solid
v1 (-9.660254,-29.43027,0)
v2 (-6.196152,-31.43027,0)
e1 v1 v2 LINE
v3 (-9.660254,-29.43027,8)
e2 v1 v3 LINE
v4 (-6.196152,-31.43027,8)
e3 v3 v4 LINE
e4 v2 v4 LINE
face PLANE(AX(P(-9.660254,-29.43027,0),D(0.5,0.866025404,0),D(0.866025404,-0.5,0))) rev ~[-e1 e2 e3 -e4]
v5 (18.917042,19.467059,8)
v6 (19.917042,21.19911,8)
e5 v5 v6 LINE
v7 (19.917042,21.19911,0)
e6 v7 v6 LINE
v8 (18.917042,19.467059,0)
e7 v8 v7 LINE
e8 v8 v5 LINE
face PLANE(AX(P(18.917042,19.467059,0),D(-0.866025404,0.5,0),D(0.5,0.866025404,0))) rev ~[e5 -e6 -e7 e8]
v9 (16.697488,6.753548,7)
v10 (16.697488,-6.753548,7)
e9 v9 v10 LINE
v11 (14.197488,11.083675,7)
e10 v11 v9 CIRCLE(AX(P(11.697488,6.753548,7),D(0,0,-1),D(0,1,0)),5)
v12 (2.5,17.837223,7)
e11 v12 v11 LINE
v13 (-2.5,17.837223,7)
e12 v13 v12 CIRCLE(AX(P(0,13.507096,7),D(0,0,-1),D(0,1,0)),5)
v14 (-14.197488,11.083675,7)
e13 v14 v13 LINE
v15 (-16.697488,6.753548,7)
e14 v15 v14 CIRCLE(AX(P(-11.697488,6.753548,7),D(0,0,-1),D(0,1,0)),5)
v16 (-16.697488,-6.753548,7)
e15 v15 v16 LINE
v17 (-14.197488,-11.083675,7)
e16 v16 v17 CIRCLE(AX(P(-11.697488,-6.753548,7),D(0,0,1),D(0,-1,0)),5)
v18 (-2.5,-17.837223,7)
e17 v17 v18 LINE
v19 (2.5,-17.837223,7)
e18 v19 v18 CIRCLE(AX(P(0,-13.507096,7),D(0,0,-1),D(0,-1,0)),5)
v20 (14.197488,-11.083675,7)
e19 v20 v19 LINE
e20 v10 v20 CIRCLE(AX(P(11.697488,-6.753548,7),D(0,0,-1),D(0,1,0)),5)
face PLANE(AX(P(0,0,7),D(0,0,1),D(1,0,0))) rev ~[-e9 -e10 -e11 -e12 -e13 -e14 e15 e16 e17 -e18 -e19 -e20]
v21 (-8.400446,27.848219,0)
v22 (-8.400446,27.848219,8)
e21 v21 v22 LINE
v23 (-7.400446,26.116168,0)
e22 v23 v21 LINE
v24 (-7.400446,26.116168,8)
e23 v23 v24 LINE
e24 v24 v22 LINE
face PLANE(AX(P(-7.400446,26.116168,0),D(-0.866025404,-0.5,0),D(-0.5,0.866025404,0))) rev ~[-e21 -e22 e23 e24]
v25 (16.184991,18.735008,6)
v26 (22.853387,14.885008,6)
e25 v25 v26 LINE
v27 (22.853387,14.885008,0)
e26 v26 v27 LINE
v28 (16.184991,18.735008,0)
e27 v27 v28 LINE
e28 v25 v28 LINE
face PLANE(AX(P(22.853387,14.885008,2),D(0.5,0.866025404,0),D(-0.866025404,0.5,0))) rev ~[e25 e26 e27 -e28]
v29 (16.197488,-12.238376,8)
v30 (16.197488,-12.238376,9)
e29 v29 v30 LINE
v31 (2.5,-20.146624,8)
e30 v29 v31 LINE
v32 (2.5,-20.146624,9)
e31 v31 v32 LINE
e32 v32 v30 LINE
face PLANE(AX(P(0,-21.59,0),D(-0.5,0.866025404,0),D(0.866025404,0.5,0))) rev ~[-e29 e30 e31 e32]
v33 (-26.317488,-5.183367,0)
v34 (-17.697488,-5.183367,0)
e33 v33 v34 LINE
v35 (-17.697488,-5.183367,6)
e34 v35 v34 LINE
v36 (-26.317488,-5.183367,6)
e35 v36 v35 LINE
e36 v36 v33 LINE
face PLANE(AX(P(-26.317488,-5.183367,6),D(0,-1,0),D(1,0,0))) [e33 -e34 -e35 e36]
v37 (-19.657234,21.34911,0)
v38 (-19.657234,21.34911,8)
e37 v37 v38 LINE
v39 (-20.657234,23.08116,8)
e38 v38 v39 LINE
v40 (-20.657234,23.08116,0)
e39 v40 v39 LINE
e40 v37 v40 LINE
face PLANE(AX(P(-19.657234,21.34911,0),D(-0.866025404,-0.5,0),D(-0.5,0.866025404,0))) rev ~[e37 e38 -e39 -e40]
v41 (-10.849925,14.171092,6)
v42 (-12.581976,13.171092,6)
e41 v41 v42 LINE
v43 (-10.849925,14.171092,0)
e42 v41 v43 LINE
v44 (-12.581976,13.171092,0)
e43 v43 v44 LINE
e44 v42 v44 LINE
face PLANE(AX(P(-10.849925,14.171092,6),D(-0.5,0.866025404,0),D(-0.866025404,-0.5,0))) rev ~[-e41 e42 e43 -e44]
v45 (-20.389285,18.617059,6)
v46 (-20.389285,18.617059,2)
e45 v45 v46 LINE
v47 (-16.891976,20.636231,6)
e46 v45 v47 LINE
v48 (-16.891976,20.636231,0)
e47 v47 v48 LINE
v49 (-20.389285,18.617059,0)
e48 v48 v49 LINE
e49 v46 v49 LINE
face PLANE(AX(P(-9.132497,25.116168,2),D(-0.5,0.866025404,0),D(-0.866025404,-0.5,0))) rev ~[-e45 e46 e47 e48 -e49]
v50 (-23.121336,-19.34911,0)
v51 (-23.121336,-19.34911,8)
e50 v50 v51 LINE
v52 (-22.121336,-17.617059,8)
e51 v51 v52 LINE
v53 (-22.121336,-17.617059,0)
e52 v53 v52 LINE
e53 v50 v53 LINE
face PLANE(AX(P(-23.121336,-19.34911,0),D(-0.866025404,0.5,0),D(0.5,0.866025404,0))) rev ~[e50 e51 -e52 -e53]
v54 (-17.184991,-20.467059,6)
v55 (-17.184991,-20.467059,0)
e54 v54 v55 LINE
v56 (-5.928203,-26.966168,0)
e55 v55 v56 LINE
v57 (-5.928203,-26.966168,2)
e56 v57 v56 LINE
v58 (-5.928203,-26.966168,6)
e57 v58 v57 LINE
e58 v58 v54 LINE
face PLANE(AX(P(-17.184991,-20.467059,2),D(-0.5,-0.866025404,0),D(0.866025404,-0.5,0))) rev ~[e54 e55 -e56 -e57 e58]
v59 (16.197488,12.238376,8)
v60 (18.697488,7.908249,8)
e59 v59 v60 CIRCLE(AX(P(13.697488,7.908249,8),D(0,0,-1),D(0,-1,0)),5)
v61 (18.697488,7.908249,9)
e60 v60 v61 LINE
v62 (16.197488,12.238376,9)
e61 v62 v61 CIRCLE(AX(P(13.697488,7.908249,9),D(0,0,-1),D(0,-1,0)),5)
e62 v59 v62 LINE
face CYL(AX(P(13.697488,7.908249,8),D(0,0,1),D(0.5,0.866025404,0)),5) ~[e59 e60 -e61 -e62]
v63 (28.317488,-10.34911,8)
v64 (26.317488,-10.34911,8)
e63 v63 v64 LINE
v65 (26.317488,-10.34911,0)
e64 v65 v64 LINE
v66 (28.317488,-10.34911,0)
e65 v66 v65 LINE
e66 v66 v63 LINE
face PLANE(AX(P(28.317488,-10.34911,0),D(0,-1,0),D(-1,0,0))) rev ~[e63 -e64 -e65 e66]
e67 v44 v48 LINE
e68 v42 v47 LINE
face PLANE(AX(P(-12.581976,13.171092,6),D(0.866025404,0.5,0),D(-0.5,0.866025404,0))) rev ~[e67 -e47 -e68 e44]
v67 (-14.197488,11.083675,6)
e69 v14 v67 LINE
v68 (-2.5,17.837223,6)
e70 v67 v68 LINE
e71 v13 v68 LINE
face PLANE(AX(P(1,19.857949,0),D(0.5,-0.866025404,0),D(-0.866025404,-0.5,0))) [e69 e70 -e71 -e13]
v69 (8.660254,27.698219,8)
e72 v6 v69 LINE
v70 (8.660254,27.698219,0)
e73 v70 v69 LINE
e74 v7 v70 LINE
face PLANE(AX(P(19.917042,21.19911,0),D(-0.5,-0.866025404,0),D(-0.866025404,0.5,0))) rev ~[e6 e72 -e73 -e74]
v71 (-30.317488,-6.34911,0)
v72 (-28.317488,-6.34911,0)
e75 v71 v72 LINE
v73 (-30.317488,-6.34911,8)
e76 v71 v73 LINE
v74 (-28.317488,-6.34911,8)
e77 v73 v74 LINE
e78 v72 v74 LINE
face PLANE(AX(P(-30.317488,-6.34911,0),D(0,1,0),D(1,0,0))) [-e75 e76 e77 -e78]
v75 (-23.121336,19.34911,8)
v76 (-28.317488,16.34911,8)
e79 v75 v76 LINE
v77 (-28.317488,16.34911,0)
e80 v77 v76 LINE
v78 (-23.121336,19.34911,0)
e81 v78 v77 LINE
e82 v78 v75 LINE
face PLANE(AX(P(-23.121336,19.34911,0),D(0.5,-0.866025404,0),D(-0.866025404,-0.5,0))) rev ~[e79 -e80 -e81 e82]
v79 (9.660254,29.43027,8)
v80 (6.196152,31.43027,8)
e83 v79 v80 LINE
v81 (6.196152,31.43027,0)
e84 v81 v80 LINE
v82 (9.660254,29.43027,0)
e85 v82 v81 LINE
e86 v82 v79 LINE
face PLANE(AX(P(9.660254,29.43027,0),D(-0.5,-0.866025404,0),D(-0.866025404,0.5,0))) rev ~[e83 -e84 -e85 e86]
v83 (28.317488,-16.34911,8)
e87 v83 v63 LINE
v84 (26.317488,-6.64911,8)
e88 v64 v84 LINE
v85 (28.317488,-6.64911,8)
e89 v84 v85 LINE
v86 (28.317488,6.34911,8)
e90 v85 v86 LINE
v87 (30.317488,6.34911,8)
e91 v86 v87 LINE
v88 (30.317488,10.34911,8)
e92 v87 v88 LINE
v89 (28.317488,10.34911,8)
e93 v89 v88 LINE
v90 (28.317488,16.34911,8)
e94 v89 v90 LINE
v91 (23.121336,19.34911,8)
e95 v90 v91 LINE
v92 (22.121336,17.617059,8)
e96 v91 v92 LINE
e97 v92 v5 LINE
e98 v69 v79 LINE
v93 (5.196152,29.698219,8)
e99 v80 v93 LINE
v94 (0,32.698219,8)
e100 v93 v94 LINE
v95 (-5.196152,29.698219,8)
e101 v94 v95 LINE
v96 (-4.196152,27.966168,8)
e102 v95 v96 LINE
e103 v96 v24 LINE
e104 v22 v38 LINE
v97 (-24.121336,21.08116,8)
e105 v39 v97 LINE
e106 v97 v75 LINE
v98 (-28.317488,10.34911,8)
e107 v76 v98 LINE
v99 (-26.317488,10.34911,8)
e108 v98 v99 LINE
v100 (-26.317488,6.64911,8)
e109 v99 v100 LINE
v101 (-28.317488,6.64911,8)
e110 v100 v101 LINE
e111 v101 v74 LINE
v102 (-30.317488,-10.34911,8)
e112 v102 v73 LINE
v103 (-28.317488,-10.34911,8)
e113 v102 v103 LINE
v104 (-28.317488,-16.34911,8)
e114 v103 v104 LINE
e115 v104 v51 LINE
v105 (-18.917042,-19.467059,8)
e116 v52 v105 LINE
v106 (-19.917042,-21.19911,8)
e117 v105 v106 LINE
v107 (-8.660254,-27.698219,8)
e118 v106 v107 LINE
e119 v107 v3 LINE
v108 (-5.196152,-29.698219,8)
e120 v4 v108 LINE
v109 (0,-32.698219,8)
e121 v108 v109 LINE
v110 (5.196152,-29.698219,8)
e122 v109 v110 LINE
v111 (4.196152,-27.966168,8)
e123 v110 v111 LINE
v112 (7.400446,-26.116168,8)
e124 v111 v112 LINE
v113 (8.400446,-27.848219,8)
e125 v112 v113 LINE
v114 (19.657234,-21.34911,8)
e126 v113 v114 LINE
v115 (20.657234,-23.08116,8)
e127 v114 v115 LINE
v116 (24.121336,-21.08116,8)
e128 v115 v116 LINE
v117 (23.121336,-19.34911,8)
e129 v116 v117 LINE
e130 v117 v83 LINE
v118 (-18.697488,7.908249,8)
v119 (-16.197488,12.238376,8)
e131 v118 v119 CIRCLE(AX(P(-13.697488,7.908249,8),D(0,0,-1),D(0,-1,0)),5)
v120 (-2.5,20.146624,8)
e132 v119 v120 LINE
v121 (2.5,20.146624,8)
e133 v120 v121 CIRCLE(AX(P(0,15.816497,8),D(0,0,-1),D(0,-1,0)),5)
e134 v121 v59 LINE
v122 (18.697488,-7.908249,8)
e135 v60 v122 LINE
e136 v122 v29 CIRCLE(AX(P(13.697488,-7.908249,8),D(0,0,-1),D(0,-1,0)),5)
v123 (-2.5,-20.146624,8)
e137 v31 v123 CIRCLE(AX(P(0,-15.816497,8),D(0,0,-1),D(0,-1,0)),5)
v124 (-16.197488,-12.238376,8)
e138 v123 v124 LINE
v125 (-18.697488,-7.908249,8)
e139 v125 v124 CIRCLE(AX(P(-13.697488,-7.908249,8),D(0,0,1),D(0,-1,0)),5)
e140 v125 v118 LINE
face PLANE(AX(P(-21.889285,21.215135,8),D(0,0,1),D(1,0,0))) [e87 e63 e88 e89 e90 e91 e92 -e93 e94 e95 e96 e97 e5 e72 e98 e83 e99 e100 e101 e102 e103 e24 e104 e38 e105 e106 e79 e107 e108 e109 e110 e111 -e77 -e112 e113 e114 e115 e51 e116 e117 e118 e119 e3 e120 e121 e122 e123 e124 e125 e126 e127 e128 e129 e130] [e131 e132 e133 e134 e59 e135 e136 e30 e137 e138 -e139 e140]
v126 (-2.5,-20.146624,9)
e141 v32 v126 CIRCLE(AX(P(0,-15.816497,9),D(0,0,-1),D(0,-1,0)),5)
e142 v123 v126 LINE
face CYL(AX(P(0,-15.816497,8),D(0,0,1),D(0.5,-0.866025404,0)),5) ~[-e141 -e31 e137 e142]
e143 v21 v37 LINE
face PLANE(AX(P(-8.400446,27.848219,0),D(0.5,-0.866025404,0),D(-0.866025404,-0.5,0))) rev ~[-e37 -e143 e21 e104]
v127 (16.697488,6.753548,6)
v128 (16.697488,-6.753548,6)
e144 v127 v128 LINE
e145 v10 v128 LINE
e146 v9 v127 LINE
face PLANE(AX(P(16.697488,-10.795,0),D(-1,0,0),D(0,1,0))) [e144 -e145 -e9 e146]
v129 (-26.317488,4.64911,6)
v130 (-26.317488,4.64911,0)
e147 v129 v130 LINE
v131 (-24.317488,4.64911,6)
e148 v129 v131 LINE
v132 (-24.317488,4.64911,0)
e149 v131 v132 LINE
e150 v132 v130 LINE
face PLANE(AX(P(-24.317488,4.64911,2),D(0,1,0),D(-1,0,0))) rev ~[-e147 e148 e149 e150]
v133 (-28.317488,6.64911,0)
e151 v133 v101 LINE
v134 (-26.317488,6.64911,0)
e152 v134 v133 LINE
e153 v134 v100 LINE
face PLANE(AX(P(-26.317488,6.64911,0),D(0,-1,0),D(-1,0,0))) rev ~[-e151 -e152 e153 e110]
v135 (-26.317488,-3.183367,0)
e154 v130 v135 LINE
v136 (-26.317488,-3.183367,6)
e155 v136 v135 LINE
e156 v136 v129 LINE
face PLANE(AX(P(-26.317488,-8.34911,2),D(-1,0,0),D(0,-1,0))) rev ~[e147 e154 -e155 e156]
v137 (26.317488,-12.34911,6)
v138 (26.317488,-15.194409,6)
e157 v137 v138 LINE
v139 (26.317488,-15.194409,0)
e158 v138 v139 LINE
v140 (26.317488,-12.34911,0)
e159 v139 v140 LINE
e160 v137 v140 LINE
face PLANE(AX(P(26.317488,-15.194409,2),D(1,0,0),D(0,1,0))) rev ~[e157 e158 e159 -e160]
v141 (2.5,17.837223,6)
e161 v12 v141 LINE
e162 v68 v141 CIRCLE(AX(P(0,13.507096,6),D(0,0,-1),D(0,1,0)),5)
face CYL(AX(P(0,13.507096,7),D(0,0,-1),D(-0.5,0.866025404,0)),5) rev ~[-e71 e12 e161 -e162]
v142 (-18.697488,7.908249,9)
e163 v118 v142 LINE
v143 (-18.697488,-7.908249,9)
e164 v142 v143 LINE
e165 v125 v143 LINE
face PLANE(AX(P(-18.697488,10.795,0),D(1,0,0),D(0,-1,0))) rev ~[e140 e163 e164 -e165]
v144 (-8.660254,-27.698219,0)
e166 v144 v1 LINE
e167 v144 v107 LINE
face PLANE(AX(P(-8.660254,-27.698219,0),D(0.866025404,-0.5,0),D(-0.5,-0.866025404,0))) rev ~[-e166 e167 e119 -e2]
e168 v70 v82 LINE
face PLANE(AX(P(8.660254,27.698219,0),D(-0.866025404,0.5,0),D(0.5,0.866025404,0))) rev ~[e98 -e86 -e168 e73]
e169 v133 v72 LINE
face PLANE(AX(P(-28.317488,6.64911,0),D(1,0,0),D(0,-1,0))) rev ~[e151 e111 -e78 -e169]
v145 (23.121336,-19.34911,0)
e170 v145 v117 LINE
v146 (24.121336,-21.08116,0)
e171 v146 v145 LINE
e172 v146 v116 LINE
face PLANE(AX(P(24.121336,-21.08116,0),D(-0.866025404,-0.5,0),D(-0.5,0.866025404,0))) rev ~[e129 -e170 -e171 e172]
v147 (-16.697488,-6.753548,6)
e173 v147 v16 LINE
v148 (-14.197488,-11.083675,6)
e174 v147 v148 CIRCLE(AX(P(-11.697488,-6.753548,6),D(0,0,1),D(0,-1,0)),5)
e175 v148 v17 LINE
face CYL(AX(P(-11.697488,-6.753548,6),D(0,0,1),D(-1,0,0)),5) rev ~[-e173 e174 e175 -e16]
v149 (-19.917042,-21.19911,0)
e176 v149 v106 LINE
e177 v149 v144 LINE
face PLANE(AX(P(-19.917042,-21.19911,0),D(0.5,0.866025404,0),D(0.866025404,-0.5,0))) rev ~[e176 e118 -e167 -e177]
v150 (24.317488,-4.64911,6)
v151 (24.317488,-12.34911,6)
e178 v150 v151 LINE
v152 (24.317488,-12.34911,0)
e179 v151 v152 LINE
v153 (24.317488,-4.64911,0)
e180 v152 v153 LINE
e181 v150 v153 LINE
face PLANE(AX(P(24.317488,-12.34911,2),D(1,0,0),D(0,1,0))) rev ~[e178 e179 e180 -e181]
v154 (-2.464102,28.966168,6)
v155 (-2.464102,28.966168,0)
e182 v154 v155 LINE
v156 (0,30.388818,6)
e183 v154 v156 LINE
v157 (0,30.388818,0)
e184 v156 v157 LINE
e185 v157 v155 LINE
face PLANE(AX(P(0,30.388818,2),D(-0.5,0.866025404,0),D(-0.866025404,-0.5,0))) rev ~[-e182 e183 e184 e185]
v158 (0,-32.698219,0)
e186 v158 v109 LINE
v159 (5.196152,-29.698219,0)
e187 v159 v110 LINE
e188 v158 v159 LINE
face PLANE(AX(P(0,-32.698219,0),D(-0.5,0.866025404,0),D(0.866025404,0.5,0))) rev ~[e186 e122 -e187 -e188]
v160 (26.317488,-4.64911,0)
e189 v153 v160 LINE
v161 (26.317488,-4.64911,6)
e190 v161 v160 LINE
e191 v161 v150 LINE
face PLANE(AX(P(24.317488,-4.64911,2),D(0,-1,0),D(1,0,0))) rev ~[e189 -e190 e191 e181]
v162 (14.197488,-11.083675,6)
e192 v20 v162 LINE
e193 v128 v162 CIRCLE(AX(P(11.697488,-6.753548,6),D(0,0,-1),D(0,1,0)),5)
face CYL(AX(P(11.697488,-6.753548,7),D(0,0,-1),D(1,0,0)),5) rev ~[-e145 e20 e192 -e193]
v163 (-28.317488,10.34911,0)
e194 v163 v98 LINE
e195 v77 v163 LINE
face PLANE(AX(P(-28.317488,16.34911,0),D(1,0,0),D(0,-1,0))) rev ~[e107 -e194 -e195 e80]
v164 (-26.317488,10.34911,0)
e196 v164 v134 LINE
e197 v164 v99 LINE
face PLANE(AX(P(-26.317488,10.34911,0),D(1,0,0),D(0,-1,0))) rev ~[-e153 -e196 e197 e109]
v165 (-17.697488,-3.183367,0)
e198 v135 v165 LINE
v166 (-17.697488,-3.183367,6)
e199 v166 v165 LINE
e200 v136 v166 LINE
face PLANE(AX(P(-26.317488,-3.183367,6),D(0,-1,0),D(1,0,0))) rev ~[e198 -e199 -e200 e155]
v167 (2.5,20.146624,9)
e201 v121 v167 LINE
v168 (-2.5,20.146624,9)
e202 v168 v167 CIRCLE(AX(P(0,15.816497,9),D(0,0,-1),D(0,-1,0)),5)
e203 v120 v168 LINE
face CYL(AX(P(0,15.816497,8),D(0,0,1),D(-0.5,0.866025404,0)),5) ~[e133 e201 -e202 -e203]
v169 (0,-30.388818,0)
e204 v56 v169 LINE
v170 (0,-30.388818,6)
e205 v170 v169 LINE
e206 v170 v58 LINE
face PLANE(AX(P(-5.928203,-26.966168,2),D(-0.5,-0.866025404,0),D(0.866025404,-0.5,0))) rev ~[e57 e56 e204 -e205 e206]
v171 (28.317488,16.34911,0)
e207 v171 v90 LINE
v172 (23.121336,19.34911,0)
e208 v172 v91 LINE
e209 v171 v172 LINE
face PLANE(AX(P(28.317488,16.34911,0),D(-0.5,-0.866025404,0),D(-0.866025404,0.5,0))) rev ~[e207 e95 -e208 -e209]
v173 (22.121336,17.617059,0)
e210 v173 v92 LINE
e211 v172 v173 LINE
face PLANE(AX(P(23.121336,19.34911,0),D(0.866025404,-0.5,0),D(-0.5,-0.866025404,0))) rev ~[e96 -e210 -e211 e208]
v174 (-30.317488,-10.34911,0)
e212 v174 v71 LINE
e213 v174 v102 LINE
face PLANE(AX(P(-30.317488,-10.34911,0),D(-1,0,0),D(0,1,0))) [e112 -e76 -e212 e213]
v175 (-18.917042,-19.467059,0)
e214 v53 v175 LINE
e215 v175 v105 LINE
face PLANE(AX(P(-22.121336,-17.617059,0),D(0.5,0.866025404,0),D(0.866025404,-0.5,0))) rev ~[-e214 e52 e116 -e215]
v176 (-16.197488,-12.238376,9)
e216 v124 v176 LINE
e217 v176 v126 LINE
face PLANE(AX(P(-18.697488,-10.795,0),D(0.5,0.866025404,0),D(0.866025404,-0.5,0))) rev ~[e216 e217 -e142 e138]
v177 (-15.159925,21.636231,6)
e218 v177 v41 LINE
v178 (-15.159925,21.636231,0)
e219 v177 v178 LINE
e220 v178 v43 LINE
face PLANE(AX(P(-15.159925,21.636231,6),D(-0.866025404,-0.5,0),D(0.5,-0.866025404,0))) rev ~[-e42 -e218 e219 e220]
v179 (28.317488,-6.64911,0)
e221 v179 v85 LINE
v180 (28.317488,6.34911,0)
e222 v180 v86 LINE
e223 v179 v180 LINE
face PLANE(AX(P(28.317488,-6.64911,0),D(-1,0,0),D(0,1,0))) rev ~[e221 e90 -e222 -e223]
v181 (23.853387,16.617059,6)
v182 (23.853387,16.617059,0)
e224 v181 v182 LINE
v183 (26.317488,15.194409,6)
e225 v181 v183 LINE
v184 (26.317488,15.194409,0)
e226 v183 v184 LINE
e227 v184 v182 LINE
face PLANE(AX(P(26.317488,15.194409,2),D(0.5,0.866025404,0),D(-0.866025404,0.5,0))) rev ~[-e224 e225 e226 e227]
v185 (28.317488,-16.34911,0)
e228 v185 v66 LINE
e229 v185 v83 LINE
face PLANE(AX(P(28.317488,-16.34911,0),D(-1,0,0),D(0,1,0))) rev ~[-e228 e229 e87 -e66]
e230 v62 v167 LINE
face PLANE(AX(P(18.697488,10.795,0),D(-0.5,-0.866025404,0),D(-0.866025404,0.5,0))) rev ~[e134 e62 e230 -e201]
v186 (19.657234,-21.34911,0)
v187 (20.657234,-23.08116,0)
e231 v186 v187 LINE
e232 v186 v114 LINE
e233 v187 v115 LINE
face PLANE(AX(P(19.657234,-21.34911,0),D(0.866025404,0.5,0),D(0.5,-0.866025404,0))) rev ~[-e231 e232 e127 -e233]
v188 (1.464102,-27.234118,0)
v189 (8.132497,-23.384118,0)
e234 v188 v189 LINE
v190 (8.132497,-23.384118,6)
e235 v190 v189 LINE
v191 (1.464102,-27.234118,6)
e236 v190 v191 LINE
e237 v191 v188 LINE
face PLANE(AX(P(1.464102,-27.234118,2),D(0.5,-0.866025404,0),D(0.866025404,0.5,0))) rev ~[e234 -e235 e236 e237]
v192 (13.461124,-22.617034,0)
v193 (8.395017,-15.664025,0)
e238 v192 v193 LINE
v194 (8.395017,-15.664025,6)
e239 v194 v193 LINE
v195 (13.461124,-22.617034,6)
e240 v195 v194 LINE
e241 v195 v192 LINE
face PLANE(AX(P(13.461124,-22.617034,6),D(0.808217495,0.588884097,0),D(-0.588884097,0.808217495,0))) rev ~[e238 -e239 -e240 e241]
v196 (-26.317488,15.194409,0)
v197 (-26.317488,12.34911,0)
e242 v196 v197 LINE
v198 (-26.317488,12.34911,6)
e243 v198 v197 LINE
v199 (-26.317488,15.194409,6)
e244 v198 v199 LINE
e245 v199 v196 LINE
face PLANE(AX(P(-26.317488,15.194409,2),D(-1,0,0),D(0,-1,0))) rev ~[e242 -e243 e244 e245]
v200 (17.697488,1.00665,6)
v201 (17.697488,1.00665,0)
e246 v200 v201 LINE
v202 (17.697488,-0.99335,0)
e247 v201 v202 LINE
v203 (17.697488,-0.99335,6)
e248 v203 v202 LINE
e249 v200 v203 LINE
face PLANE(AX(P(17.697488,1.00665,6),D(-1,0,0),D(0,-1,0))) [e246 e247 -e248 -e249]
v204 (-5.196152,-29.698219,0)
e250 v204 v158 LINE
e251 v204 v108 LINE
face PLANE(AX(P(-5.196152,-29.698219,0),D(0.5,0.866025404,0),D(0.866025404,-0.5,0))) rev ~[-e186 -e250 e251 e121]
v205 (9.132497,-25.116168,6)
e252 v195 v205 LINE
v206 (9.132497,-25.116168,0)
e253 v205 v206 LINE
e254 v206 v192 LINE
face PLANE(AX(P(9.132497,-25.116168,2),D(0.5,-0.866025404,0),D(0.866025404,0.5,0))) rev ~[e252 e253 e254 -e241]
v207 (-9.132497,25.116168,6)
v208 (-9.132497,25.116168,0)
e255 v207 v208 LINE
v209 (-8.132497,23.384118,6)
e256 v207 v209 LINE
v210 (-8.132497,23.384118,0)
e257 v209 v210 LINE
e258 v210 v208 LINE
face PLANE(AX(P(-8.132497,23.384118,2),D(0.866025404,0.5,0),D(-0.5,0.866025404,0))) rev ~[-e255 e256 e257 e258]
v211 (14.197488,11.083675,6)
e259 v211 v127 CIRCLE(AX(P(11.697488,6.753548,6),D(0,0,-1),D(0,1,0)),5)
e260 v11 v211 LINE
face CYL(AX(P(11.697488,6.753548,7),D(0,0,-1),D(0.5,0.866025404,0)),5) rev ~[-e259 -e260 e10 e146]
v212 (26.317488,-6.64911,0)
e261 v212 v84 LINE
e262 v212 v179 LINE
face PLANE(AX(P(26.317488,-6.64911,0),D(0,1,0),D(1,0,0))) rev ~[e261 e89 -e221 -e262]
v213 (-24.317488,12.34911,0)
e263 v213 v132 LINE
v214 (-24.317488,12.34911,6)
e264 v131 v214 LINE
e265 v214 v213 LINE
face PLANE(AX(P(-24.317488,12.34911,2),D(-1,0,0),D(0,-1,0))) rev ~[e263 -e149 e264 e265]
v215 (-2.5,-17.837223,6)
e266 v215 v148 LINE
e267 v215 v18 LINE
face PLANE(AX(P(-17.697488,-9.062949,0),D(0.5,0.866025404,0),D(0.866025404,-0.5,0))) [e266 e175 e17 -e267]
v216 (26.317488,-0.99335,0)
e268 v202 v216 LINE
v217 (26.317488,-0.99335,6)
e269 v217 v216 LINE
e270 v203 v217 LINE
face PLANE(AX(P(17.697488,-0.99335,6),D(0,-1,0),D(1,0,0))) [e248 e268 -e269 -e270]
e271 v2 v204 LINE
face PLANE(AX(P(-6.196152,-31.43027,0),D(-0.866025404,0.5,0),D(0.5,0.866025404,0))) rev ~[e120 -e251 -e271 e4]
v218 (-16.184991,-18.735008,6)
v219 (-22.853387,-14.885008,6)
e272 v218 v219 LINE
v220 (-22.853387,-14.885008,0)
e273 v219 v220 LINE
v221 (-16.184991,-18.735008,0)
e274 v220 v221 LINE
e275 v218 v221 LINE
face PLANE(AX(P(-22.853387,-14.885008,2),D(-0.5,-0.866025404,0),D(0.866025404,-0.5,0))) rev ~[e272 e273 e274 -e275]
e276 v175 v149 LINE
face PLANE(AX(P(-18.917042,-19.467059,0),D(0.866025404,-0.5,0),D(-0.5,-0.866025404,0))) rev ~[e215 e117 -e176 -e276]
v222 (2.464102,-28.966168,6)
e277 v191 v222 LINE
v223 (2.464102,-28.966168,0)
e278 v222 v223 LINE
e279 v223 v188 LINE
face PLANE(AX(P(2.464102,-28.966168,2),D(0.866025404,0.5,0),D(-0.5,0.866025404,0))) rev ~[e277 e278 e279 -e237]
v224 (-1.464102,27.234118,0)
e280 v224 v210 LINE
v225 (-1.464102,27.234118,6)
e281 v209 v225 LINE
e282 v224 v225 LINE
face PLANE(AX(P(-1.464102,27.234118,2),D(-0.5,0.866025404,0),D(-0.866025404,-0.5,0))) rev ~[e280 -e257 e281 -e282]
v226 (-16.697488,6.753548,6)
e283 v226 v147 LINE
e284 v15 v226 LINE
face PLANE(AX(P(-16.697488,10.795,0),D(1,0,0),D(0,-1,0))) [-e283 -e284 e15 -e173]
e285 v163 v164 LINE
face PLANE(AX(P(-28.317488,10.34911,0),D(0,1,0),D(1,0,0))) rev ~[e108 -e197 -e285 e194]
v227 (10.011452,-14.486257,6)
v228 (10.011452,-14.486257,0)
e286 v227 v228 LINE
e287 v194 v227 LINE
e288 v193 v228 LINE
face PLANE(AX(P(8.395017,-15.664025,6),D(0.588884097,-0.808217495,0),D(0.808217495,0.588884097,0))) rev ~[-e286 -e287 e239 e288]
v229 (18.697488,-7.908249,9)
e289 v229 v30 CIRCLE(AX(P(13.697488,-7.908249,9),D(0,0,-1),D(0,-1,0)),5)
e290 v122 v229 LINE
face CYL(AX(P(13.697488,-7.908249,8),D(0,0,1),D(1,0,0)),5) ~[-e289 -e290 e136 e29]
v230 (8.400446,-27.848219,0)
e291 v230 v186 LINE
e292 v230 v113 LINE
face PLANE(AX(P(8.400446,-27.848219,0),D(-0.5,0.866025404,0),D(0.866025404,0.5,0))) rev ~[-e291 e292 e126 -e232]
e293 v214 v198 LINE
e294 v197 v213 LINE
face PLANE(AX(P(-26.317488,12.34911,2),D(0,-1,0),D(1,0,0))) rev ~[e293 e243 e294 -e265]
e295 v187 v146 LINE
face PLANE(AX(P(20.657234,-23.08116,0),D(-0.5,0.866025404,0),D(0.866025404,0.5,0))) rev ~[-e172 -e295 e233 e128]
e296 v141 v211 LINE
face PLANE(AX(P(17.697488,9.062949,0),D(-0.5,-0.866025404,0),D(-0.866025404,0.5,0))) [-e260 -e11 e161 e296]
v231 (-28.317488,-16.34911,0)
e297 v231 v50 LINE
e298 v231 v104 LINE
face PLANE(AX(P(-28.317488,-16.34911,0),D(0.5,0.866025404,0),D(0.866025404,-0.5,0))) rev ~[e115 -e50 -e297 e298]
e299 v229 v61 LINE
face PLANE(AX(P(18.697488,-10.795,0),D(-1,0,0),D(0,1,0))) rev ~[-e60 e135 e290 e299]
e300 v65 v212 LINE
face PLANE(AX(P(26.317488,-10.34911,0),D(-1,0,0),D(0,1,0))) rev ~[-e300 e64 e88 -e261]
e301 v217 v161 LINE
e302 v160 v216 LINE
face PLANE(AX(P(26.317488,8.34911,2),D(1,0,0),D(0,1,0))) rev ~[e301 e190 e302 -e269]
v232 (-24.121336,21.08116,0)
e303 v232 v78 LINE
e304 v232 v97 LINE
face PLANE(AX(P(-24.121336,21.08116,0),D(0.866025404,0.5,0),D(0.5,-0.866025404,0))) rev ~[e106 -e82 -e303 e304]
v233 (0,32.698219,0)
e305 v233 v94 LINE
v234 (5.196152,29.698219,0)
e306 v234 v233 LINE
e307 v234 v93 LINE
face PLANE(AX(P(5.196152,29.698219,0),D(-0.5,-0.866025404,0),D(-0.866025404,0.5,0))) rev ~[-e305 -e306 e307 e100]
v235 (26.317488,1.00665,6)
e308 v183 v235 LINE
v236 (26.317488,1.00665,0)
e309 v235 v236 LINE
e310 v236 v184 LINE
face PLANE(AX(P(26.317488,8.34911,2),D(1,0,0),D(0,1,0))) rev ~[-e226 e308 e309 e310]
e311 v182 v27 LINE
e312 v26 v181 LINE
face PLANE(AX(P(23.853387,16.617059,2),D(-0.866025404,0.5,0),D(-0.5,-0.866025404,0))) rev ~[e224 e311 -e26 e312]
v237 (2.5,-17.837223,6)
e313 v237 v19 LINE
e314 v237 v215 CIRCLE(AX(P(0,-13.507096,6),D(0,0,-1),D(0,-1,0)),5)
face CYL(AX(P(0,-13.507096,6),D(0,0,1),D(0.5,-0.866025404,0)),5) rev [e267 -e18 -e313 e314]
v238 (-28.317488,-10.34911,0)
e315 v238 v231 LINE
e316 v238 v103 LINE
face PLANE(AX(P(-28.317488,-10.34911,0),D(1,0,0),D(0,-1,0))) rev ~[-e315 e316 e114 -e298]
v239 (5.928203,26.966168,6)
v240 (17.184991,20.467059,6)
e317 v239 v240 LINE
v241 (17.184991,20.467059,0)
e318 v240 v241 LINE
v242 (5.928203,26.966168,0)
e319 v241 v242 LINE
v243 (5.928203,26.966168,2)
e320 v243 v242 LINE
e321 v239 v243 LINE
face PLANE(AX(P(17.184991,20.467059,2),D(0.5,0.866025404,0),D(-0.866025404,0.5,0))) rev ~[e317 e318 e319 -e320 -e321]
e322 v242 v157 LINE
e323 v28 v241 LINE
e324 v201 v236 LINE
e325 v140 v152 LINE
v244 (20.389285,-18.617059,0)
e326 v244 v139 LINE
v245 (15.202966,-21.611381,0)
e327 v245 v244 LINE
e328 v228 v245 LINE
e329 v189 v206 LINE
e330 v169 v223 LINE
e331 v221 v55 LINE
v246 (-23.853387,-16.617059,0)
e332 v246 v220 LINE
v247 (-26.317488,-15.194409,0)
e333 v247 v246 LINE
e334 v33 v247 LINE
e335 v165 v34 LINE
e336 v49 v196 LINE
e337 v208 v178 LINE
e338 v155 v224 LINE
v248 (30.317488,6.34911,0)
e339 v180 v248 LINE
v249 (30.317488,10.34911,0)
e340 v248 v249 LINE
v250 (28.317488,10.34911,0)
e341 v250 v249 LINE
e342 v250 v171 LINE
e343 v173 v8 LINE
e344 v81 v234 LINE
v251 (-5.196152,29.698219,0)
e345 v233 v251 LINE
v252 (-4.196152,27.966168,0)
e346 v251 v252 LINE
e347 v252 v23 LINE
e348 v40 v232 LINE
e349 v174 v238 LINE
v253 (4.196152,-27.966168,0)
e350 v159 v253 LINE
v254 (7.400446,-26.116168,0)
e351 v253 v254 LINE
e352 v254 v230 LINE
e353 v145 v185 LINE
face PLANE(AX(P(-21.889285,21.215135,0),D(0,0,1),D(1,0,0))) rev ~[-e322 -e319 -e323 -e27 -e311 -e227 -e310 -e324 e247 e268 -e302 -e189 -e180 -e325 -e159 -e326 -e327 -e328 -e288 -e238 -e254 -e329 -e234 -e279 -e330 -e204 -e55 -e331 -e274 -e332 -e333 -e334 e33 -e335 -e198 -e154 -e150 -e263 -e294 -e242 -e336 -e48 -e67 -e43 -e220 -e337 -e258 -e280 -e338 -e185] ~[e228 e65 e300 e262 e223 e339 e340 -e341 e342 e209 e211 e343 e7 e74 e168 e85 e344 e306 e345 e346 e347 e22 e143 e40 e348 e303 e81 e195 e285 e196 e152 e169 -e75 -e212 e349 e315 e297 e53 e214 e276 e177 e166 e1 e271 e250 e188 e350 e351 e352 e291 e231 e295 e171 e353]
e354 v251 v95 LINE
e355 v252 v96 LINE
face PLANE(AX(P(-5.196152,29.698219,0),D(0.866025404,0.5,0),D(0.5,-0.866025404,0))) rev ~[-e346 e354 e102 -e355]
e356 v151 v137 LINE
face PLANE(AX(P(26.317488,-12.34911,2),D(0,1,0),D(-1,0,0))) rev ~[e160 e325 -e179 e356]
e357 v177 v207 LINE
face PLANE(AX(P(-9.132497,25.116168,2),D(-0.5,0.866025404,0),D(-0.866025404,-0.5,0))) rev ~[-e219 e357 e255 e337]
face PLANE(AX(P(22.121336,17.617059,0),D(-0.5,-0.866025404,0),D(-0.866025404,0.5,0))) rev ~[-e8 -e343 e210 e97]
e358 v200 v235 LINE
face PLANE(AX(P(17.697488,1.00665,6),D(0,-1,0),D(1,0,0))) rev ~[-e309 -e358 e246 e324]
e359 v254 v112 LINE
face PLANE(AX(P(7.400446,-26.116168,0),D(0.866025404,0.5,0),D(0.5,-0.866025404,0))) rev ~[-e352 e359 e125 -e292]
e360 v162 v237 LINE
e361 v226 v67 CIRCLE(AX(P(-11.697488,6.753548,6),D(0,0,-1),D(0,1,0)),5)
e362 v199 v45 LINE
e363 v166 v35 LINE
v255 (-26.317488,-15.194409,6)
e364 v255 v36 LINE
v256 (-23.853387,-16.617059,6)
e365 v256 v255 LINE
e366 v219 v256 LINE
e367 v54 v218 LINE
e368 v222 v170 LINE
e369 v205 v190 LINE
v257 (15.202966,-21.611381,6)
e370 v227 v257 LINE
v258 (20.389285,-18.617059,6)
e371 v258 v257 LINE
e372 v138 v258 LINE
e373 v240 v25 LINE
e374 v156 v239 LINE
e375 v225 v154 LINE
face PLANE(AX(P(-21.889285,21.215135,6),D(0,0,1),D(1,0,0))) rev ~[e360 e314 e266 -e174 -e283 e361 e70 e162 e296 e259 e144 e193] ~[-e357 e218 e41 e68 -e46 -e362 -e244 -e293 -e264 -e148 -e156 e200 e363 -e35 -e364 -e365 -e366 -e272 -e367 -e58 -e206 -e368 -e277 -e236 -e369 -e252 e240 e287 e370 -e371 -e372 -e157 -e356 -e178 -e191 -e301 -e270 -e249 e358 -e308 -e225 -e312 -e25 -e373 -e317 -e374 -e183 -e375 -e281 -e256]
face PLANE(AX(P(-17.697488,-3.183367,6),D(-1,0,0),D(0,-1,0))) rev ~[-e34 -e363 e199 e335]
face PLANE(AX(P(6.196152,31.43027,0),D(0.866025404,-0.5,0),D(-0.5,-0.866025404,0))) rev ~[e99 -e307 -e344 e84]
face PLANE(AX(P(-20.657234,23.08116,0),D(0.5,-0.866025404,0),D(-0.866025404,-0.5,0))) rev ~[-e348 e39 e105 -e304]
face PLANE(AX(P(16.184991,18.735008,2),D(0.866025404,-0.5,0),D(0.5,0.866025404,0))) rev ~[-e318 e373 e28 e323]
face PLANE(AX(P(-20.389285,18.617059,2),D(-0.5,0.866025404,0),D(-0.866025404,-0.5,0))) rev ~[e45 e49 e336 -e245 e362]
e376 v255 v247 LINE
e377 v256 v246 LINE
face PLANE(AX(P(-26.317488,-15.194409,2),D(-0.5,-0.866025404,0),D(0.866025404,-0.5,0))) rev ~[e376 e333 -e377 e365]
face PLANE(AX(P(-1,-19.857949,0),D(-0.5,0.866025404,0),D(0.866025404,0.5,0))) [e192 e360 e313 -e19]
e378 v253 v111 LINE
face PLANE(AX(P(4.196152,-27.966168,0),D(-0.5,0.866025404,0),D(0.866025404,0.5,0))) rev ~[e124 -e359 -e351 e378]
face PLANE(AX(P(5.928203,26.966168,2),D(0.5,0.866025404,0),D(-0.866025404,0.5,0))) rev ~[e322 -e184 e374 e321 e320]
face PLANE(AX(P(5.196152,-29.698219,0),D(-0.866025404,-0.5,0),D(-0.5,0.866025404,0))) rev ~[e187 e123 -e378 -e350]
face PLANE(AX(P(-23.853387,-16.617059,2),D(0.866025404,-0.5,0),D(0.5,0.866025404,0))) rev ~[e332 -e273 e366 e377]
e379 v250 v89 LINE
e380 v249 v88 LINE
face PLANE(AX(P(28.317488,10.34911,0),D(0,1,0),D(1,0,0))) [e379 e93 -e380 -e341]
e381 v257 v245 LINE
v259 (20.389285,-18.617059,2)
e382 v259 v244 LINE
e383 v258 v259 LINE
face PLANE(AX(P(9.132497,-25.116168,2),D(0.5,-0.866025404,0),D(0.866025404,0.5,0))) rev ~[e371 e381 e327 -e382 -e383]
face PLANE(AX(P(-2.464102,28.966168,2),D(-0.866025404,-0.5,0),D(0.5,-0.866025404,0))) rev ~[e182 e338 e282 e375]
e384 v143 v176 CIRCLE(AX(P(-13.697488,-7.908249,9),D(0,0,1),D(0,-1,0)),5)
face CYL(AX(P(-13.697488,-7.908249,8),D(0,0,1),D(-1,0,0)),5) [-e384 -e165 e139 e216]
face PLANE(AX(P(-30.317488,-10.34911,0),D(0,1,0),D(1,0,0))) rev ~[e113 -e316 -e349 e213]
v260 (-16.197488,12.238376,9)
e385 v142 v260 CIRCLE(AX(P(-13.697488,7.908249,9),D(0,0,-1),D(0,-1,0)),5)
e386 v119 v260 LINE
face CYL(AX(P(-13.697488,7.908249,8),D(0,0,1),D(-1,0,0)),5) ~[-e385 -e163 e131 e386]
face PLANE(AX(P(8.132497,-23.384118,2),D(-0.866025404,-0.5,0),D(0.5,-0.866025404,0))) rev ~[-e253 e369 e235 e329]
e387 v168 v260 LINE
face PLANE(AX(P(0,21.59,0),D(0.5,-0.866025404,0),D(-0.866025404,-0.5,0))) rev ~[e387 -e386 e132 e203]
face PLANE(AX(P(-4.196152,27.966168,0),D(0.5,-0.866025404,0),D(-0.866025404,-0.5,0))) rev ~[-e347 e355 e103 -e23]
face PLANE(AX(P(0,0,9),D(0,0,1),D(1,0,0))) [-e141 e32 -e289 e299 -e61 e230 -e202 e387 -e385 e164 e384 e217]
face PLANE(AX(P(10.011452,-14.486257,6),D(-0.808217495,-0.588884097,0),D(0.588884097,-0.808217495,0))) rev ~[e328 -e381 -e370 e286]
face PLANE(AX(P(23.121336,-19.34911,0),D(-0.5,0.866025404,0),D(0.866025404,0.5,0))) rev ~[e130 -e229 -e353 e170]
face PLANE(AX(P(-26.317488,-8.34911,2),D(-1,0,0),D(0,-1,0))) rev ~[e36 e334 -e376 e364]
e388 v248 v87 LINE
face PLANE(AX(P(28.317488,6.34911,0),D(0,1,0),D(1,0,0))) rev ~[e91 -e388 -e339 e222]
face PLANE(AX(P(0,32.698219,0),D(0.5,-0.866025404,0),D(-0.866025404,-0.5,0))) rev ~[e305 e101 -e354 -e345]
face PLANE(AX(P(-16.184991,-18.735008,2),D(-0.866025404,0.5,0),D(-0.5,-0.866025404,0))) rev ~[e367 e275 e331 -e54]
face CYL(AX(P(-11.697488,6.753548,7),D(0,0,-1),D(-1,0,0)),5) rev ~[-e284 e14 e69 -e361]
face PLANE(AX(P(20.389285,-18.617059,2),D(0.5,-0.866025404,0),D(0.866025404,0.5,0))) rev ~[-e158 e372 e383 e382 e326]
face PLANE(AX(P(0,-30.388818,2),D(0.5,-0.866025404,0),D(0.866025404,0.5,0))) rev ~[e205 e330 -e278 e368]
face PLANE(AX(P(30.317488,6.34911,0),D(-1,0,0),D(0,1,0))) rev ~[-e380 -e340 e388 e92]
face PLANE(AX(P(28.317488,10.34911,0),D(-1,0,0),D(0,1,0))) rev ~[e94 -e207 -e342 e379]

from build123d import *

# Parameters (mm, degrees)
F0_W     = 2
F0_H     = 4
F1_DEPTH = 8
F2_DEPTH = 9
F3_T     = -2
F4_R     = 5
F5_R     = 5
F6_W     = 8.62
F6_H     = 2
F7_DEPTH = 6


with BuildPart() as f1:
    # F0 (on Top) → F1 (new body)
    with BuildSketch(Plane.XY):
        Polygon((-23.121336045, 19.3491095896), (-19.6572344299, 21.3491095896), (-20.6572344299, 23.0811603972), (-24.121336045, 21.0811603972), align=None)
        Polygon((-7.4004464167, 26.1161683716), (-26.3174884677, 15.1944090512), (-26.3174884677, 10.3491095896), (-26.3174884677, 6.6491095896), (-26.3174884677, -15.1944090512), (-22.121336045, -17.617058782), (-18.917042051, -19.467058782), (0, -30.3888181024), (4.1961524227, -27.9661683716), (7.4004464167, -26.1161683716), (26.3174884677, -15.1944090512), (26.3174884677, -10.3491095896), (26.3174884677, -6.6491095896), (26.3174884677, 15.1944090512), (22.121336045, 17.617058782), (18.917042051, 19.467058782), (0, 30.3888181024), (-4.1961524227, 27.9661683716), align=None)
        Polygon((0, -21.59), (-18.6974884677, -10.795), (-18.6974884677, 10.795), (0, 21.59), (18.6974884677, 10.795), (18.6974884677, -10.795), align=None, mode=Mode.SUBTRACT)
        Polygon((-5.1961524227, -29.6982191792), (-8.6602540378, -27.6982191792), (-9.6602540378, -29.4302699868), (-6.1961524227, -31.4302699868), align=None)
        with Locations((29.3174884677, 8.3491095896)):
            Rectangle(F0_W, F0_H)
        with Locations((-29.3174884677, -8.3491095896)):
            Rectangle(F0_W, F0_H)
        Polygon((-26.3174884677, -15.1944090512), (-26.3174884677, 6.6491095896), (-28.3174884677, 6.6491095896), (-28.3174884677, -6.3491095896), (-28.3174884677, -10.3491095896), (-28.3174884677, -16.3491095896), (-23.121336045, -19.3491095896), (-22.121336045, -17.617058782), align=None)
        Polygon((-26.3174884677, 10.3491095896), (-26.3174884677, 15.1944090512), (-7.4004464167, 26.1161683716), (-8.4004464167, 27.8482191792), (-19.6572344299, 21.3491095896), (-23.121336045, 19.3491095896), (-28.3174884677, 16.3491095896), (-28.3174884677, 10.3491095896), align=None)
        Polygon((0, -30.3888181024), (-18.917042051, -19.467058782), (-19.917042051, -21.1991095896), (-8.6602540378, -27.6982191792), (-5.1961524227, -29.6982191792), (0, -32.6982191792), (5.1961524227, -29.6982191792), (4.1961524227, -27.9661683716), align=None)
        Polygon((28.3174884677, -10.3491095896), (26.3174884677, -10.3491095896), (26.3174884677, -15.1944090512), (7.4004464167, -26.1161683716), (8.4004464167, -27.8482191792), (19.6572344299, -21.3491095896), (23.121336045, -19.3491095896), (28.3174884677, -16.3491095896), align=None)
        Polygon((23.121336045, -19.3491095896), (19.6572344299, -21.3491095896), (20.6572344299, -23.0811603972), (24.121336045, -21.0811603972), align=None)
        Polygon((-5.1961524227, 29.6982191792), (-4.1961524227, 27.9661683716), (0, 30.3888181024), (18.917042051, 19.467058782), (19.917042051, 21.1991095896), (8.6602540378, 27.6982191792), (5.1961524227, 29.6982191792), (0, 32.6982191792), align=None)
        Polygon((6.1961524227, 31.4302699868), (5.1961524227, 29.6982191792), (8.6602540378, 27.6982191792), (9.6602540378, 29.4302699868), align=None)
        Polygon((23.121336045, 19.3491095896), (22.121336045, 17.617058782), (26.3174884677, 15.1944090512), (26.3174884677, -6.6491095896), (28.3174884677, -6.6491095896), (28.3174884677, 6.3491095896), (28.3174884677, 10.3491095896), (28.3174884677, 16.3491095896), align=None)
    extrude(amount=F1_DEPTH)

    # F0 (on Top) → F2 (join)
    with BuildSketch(Plane.XY):
        Polygon((-18.6974884677, 10.795), (-18.6974884677, -10.795), (0, -21.59), (18.6974884677, -10.795), (18.6974884677, 10.795), (0, 21.59), align=None)
    extrude(amount=F2_DEPTH)

    # F3: a shell. OpenCascade refuses it in one call, so the cavity is built on its own and cut out:
    # the body offset inwards by the wall thickness, plus a prism from it out through each open face.
    f3_core = offset(f1.part, amount=F3_T, kind=Kind.INTERSECTION, mode=Mode.PRIVATE)
    f3_exits = [f3_core.faces().sort_by_distance(p)[0] for p in [
        (0, 0, 2),
    ]]
    add(f3_core, mode=Mode.SUBTRACT)
    extrude(f3_exits, amount=-F3_T, mode=Mode.SUBTRACT)

    # F4
    f4_edges = [f1.edges().sort_by_distance(p)[0] for p in [
        (-18.697488, 10.795, 8.5),
        (-18.697488, -10.795, 8.5),
        (0, -21.59, 8.5),
        (18.697488, -10.795, 8.5),
        (18.697488, 10.795, 8.5),
        (0, 21.59, 8.5),
    ]]
    fillet(f4_edges, radius=F4_R)

    # F5
    f5_edges = [f1.edges().sort_by_distance(p)[0] for p in [
        (16.697488, -9.640299, 6.5),
        (0, -19.280599, 6.5),
        (-16.697488, -9.640299, 6.5),
        (-16.697488, 9.640299, 6.5),
        (0, 19.280599, 6.5),
        (16.697488, 9.640299, 6.5),
    ]]
    fillet(f5_edges, radius=F5_R)

    # F6 (on face) → F7 (join)
    with BuildSketch(Plane(origin=(0, 0, 6), x_dir=(1, 0, 0), z_dir=(0, 0, -1))):
        Polygon((15.2029661558, 21.6113814999), (13.4611243361, 22.6170343434), (8.3950167715, 15.6640247696), (10.0114517622, 14.4862565748), align=None)
        with Locations((-22.0074884677, 4.1833669636)):
            Rectangle(F6_W, F6_H)
        with Locations((22.0074884677, -0.0066501563)):
            Rectangle(F6_W, F6_H)
        Polygon((-12.5819755408, -13.1710924962), (-16.8919755408, -20.6362314769), (-15.1599247332, -21.6362314769), (-10.8499247332, -14.1710924962), align=None)
    extrude(amount=F7_DEPTH)


solid = f1.part
